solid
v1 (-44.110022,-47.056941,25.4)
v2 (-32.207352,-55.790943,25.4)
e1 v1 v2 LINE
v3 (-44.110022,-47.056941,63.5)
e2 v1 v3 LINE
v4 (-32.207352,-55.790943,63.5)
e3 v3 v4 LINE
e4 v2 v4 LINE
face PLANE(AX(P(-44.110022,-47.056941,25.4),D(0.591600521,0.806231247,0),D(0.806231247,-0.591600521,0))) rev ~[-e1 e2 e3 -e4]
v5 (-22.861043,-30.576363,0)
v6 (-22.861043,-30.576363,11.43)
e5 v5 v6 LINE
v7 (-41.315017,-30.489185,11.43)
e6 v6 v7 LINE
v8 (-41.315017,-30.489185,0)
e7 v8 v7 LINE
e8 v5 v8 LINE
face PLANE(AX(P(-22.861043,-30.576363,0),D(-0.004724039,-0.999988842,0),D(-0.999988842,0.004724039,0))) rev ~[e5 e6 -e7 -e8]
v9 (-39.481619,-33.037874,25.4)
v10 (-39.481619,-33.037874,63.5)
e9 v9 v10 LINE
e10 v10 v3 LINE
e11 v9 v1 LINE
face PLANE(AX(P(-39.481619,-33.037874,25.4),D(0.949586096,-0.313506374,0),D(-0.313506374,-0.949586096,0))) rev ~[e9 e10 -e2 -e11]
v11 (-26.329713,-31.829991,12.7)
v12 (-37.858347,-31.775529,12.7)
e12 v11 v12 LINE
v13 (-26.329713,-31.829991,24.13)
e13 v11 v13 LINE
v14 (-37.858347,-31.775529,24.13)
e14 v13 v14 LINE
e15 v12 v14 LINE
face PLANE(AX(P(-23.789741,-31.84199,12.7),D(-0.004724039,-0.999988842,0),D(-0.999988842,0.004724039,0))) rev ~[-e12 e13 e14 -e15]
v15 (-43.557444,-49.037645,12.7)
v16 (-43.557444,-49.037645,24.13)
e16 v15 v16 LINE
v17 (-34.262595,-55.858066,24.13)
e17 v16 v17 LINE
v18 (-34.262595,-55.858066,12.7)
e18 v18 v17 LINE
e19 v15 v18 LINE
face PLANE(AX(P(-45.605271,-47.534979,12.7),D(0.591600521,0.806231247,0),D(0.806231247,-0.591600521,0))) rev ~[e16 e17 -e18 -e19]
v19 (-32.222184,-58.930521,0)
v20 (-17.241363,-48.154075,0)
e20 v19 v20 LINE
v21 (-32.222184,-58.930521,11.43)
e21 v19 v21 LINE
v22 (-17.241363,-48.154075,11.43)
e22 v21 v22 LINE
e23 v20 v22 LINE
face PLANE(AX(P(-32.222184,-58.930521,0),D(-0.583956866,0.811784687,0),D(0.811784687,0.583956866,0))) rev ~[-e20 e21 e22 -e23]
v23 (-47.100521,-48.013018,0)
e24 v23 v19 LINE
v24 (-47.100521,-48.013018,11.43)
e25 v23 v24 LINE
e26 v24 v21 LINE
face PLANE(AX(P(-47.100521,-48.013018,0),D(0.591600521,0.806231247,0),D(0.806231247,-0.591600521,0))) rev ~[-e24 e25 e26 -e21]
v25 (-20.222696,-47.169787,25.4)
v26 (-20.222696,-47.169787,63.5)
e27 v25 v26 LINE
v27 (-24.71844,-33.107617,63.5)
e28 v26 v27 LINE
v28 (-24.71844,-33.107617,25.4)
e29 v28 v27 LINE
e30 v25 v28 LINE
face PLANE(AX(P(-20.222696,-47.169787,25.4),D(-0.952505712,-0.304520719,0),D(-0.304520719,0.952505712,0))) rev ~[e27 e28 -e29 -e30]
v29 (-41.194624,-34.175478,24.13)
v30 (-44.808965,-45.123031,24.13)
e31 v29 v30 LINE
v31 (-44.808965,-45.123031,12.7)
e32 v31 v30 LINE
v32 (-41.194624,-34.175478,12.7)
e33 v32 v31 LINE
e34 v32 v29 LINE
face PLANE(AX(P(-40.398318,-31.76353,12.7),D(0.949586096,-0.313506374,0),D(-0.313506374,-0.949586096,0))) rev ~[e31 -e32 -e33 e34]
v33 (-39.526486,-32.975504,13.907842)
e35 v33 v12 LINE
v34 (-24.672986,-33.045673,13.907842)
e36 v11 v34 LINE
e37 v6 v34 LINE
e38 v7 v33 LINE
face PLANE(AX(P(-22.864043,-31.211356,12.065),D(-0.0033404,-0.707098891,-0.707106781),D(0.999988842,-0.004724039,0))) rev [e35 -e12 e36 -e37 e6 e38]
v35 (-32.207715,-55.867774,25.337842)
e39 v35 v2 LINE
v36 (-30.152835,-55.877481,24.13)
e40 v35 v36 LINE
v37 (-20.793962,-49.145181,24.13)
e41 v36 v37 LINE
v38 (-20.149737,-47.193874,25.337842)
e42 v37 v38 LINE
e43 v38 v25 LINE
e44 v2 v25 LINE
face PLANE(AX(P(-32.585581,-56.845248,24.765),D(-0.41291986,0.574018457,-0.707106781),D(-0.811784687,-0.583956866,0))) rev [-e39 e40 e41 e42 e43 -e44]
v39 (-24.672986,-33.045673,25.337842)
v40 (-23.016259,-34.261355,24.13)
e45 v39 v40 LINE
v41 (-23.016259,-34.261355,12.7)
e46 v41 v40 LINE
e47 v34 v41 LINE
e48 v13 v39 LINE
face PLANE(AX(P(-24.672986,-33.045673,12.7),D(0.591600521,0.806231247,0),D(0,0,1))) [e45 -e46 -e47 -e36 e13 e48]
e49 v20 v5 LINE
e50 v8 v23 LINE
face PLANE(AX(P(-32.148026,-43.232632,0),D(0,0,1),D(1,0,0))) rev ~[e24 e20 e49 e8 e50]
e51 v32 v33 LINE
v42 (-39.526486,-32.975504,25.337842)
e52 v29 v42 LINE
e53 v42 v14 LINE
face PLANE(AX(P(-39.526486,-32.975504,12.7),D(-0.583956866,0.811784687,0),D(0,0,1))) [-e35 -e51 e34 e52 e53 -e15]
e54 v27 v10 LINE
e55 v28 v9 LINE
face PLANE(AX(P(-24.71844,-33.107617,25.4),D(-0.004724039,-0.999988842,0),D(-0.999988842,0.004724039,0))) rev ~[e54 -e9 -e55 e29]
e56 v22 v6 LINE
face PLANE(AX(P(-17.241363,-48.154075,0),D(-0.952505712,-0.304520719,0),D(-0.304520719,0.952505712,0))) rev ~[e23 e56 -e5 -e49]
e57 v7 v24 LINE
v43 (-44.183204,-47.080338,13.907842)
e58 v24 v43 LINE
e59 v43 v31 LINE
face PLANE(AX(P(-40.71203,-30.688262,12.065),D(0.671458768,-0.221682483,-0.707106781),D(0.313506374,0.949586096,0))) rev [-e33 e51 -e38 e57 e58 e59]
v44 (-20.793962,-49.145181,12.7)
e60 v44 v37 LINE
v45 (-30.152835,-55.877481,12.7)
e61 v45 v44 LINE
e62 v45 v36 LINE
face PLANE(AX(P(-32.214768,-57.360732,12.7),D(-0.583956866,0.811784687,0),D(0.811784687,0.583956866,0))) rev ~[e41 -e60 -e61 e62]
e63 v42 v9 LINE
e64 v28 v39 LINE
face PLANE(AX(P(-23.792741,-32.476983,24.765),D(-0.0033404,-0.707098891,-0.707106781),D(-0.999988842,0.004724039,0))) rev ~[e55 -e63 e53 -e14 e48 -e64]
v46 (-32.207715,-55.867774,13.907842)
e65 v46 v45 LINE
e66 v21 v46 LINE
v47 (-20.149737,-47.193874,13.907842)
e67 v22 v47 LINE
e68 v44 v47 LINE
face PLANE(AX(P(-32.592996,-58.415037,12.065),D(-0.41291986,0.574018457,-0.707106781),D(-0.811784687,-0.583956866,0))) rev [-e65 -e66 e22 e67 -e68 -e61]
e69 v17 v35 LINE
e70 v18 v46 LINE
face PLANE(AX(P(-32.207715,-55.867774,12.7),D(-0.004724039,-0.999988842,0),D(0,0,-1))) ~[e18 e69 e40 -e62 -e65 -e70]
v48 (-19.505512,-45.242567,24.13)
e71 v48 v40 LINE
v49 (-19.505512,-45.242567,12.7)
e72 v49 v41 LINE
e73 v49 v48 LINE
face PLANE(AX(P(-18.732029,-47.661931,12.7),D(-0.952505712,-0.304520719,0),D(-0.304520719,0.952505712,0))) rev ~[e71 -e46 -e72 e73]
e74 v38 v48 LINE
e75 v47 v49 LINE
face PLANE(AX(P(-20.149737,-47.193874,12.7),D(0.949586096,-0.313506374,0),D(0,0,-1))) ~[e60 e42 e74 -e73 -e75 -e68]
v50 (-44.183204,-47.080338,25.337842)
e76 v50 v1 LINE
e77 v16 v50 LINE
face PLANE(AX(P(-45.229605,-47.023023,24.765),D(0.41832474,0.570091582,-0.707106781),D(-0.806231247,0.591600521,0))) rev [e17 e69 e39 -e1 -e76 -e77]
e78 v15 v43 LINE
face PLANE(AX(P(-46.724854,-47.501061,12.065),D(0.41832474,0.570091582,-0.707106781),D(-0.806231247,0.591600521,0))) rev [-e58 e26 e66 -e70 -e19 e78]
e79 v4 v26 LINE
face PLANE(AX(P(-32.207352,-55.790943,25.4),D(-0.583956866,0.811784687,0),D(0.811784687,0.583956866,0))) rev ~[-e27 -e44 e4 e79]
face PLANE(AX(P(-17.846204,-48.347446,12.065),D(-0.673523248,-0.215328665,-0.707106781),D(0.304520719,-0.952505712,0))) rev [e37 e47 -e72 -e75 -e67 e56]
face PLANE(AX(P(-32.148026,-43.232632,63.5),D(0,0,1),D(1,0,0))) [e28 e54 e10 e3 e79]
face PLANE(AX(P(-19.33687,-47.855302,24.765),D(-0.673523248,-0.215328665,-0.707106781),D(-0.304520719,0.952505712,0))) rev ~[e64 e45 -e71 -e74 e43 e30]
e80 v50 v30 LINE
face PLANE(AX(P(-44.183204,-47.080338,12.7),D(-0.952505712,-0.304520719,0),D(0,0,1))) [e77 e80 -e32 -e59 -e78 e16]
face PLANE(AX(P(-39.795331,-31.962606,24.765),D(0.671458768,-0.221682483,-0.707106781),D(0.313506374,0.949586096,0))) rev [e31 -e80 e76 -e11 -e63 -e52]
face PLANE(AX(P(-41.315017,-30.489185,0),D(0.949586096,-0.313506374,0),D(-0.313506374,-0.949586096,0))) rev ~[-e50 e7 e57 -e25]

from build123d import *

# Parameters (mm, degrees)
F1_DEPTH = 12.7
F2_SIZE  = 1.27
F3_DEPTH = 12.7
F4_SIZE  = 1.27
F5_DEPTH = 38.1
F6_SIZE  = 2.54


# Not quite as in the source:
# - two fillets or chamfers of one size are made in one step
# - a feature of the source that left no trace in its solid (it failed there, or was rolled back) is left out


with BuildPart() as f1:
    # F0 (on Top) → F1 (new body)
    with BuildSketch(Plane.XY):
        Polygon((-32.2221838869, -58.9305205708), (-17.2413629738, -48.1540753293), (-22.8610431915, -30.5763632619), (-41.315017485, -30.4891850014), (-47.1005206082, -48.0130179407), align=None)
    extrude(amount=F1_DEPTH)

    # F2
    f2_edges = [f1.edges().sort_by_distance(p)[0] for p in [
        (-39.661352, -53.471769, 12.7),
        (-24.731773, -53.542298, 12.7),
        (-20.051203, -39.365219, 12.7),
        (-32.08803, -30.532774, 12.7),
        (-44.207769, -39.251101, 12.7),
    ]]
    chamfer(f2_edges, length=F2_SIZE)

    # F3 (add): a face of the model
    f3_faces = [f1.faces().sort_by_distance(p)[0] for p in [
        (-32.1480256291, -43.2326324208, 12.7),
    ]]
    extrude(f3_faces, amount=F3_DEPTH)

    # F4
    f4_edges = [f1.edges().sort_by_distance(p)[0] for p in [
        (-38.91002, -52.447856, 25.4),
        (-43.001795, -39.649255, 25.4),
        (-25.473399, -52.511331, 25.4),
        (-32.09403, -31.80276, 25.4),
        (-21.260885, -39.751961, 25.4),
    ]]
    chamfer(f4_edges, length=F4_SIZE)

    # F5 (add): a face of the model
    f5_faces = [f1.faces().sort_by_distance(p)[0] for p in [
        (-32.1480256291, -43.2326324208, 25.4),
    ]]
    extrude(f5_faces, amount=F5_DEPTH)

    # F6
    f6_edges = [f1.edges().sort_by_distance(p)[0] for p in [
        (-45.605271, -47.534979, 18.415),
        (-32.214768, -57.360732, 18.415),
        (-40.398318, -31.76353, 18.415),
        (-18.732029, -47.661931, 18.415),
        (-23.789741, -31.84199, 18.415),
    ]]
    chamfer(f6_edges, length=F6_SIZE)


solid = f1.part
